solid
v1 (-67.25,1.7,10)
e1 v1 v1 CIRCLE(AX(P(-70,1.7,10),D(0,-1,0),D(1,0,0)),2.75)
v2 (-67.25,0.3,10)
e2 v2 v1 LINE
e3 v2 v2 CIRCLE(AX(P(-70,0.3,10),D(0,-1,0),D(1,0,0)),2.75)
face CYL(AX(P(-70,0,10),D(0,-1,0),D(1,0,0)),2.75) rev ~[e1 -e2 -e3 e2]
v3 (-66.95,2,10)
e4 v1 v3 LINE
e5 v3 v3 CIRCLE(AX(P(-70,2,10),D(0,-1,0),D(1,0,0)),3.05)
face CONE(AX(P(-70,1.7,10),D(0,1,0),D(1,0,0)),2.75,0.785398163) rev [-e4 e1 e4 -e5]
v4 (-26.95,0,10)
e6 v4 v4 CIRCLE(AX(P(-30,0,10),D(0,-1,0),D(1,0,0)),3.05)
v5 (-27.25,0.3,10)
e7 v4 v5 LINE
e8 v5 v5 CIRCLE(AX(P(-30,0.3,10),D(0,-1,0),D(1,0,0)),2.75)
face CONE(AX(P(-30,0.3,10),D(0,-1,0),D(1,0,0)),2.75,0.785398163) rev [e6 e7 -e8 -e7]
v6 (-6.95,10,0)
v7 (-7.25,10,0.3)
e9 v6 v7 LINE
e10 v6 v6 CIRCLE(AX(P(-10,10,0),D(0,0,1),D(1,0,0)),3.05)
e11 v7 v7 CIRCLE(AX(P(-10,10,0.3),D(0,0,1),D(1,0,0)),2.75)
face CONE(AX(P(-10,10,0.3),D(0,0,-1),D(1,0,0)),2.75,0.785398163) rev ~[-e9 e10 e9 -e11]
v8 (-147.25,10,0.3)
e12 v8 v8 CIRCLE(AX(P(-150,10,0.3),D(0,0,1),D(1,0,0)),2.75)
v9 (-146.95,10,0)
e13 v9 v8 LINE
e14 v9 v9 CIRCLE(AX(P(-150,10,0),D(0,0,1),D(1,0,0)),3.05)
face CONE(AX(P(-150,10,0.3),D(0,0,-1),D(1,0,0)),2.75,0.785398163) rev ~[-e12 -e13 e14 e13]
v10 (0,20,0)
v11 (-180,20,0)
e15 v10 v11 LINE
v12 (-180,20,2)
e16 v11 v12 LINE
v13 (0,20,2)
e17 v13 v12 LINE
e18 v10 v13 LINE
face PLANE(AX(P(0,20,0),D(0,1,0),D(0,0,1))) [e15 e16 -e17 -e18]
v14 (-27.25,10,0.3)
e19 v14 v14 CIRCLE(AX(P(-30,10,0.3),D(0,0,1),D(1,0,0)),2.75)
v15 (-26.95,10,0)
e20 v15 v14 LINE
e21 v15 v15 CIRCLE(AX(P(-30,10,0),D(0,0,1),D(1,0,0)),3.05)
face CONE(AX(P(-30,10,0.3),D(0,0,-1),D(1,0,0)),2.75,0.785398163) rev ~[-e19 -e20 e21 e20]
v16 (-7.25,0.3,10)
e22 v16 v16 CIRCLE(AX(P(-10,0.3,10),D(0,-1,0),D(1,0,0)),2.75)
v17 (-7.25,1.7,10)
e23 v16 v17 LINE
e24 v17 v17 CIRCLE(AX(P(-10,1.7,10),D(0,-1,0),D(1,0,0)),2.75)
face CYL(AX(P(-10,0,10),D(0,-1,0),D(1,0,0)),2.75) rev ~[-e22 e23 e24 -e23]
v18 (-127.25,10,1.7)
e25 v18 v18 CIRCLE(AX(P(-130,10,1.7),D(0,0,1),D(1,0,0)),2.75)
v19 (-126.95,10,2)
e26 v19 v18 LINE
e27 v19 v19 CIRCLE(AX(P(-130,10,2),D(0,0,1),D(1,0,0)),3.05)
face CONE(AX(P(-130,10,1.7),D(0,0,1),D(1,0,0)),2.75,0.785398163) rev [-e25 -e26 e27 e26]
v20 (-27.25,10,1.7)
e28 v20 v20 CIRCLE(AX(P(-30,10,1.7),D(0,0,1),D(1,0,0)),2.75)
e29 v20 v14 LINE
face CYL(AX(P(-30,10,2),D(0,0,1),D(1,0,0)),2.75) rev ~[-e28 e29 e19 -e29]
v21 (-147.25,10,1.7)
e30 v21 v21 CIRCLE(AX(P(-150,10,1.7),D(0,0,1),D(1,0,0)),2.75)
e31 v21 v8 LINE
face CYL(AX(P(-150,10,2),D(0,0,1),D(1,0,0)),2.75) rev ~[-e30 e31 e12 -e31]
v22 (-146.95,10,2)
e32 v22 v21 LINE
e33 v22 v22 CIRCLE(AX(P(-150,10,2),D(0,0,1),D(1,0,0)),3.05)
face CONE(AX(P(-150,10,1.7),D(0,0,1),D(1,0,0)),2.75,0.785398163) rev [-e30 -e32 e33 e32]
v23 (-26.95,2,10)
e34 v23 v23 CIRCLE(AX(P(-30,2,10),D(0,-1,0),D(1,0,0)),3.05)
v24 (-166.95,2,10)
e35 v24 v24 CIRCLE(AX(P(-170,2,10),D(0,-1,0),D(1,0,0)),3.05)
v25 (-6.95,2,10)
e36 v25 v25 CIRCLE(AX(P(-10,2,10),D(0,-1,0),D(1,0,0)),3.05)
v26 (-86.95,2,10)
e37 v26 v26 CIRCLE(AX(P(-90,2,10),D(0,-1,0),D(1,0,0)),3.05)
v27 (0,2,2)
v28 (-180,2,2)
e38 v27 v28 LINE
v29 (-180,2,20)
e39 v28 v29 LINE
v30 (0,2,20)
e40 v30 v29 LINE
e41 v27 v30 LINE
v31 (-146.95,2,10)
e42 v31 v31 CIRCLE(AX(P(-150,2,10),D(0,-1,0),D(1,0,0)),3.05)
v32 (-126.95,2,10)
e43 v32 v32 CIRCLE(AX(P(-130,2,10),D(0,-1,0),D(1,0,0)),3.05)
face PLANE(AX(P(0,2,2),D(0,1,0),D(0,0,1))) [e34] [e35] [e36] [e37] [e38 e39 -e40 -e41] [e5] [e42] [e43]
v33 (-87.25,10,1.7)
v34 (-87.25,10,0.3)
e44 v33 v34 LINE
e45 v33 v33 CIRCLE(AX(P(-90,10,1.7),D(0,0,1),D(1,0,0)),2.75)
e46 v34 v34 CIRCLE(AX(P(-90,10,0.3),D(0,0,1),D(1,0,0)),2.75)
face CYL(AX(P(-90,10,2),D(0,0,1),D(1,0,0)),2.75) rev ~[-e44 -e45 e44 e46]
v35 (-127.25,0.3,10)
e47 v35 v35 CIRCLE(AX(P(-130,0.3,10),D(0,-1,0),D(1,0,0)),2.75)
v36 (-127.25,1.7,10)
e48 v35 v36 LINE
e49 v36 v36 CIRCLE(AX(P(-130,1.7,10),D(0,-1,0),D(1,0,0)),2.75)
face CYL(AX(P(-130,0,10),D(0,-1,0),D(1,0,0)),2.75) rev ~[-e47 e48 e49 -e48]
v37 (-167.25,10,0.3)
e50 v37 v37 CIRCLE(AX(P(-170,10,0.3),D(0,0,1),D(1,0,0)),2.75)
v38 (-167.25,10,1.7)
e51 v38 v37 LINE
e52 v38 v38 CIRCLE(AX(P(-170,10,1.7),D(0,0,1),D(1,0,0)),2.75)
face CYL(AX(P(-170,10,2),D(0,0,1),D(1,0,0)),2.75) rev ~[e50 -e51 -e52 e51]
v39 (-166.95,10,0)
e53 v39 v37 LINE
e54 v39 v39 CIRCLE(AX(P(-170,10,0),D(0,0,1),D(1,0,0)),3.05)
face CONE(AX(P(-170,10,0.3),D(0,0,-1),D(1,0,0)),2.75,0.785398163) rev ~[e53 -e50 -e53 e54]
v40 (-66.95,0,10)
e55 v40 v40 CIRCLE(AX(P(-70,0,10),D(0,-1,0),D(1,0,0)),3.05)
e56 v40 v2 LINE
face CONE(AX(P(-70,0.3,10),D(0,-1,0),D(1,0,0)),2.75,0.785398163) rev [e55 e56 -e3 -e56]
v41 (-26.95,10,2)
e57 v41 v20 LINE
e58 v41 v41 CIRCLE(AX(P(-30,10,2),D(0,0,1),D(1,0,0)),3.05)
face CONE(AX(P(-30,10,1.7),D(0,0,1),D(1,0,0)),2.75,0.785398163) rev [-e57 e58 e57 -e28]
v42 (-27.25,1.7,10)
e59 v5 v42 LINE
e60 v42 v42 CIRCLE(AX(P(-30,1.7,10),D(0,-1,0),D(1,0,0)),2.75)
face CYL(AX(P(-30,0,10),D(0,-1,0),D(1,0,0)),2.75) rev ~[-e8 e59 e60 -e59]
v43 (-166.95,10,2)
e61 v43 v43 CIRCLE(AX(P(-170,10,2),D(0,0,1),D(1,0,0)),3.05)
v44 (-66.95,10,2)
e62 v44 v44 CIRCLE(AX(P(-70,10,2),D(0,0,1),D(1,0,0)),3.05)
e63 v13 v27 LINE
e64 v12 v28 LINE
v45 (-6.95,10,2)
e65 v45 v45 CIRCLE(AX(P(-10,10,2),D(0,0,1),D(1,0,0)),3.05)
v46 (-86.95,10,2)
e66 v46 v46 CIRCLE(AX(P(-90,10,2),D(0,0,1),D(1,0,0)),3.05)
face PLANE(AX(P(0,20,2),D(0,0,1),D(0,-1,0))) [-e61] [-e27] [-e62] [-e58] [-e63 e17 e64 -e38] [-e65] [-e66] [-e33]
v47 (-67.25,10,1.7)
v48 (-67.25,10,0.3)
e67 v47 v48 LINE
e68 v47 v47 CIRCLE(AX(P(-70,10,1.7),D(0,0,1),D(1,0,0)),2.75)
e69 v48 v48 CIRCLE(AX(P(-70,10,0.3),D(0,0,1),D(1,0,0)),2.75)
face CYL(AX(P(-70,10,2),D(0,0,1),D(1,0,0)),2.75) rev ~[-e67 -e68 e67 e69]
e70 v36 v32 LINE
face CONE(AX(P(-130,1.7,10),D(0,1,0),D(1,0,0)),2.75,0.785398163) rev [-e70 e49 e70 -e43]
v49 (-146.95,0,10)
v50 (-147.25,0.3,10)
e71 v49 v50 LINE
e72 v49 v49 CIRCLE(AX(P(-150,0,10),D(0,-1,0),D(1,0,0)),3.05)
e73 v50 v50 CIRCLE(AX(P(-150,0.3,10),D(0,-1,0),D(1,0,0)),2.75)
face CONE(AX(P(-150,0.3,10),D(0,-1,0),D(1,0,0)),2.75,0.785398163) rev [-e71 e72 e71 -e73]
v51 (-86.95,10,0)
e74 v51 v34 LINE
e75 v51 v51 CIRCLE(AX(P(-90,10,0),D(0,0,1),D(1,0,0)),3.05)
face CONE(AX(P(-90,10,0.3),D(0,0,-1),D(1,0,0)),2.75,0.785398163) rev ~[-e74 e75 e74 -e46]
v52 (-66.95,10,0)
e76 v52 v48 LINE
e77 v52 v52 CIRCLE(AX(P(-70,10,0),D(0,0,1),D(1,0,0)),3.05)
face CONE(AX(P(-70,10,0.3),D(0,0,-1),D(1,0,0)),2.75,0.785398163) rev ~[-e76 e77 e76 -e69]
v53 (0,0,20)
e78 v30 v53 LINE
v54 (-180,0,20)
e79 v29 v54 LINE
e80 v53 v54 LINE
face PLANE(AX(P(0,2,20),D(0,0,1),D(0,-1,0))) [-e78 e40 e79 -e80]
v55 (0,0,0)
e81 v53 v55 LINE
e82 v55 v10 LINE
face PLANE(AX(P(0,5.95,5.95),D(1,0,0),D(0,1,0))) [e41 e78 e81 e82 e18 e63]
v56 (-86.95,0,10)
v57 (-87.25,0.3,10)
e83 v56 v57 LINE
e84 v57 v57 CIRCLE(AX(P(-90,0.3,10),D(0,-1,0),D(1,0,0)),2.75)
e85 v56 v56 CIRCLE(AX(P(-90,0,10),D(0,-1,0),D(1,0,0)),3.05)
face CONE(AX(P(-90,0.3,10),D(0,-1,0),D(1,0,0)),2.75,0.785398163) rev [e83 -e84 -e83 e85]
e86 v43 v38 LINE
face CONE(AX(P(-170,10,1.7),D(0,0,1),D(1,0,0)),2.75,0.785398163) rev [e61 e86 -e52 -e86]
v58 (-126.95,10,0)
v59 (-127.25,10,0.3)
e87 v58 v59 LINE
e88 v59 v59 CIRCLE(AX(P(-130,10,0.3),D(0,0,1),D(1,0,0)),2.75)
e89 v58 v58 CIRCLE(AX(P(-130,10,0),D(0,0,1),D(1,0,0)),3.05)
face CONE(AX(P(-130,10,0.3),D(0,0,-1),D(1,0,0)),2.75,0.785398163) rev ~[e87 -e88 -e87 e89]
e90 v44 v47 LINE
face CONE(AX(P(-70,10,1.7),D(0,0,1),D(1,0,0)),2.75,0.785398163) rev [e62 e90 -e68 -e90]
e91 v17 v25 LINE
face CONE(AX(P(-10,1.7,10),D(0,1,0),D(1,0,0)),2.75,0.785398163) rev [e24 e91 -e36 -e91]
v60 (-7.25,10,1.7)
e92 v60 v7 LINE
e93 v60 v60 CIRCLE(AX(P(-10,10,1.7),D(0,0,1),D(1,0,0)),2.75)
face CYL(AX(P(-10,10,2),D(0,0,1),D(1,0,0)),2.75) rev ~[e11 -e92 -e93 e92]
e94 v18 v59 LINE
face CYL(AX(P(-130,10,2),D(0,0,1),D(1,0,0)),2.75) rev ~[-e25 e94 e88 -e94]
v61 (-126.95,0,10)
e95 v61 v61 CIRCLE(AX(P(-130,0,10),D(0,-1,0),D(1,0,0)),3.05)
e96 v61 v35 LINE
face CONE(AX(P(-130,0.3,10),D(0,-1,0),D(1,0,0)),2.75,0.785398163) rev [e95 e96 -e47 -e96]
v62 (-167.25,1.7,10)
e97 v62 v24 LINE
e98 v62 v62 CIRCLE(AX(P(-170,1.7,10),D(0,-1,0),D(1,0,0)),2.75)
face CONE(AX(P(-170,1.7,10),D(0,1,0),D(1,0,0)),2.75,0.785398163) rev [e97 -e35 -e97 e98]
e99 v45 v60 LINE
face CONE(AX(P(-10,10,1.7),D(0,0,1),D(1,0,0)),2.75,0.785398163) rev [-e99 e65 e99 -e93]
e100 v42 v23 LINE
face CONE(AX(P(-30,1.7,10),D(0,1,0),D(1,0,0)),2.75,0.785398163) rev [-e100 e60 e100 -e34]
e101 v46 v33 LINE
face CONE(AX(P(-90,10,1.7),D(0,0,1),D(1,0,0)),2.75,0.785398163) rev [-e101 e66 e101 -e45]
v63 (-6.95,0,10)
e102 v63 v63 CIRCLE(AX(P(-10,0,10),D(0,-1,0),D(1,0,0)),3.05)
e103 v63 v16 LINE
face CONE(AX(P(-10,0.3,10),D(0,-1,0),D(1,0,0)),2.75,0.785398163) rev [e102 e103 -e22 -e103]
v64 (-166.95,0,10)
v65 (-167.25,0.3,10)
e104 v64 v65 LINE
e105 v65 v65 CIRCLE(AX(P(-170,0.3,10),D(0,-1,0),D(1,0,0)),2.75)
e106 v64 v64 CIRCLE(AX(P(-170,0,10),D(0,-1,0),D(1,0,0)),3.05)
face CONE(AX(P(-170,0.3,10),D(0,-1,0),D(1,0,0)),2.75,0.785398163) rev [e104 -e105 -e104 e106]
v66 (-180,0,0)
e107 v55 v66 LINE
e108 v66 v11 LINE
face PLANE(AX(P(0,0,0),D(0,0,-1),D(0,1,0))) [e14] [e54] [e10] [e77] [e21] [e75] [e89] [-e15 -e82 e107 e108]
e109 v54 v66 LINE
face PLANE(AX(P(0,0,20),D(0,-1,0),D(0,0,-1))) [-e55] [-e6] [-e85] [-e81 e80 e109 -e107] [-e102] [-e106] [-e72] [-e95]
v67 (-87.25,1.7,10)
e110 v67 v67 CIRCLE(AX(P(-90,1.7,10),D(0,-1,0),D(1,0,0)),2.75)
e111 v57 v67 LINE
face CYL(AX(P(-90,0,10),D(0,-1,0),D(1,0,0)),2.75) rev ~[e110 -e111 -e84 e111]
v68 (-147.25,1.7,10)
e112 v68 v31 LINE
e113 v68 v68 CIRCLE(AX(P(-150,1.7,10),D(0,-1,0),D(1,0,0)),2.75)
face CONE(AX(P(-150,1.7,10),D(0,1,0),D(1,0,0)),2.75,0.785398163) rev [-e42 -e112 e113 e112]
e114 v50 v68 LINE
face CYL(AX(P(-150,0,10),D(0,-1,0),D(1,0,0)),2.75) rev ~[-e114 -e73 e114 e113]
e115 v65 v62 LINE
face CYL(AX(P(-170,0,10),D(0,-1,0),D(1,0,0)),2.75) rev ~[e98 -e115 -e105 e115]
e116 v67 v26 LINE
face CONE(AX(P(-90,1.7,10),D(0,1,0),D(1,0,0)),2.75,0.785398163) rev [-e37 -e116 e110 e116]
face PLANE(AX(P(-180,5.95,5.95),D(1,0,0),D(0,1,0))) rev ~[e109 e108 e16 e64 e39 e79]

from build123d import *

# Parameters (mm, degrees)
F1_DEPTH = 180
F2_R     = 2.75
F3_DEPTH = 2.001
F4_R     = 2.75
F5_DEPTH = 20.001
F6_SIZE  = 0.3


# Not quite as in the source:
# - a feature names something its author has since deleted; it is built from what else it names


with BuildPart() as f1:
    # F0 (on Right) → F1 (new body)
    with BuildSketch(Plane.YZ):
        Polygon((0, 20), (0, 0), (20, 0), (20, 2), (2, 2), (2, 20), align=None)
    extrude(amount=-F1_DEPTH)

    # F2 (on face) → F3 (cut, through all)
    with BuildSketch(Plane.XY.offset(2)):
        with Locations((-10, 10)):
            Circle(F2_R)
        with Locations((-170, 10)):
            Circle(F2_R)
        with Locations((-150, 10)):
            Circle(F2_R)
        with Locations((-90, 10)):
            Circle(F2_R)
        with Locations((-70, 10)):
            Circle(F2_R)
        with Locations((-30, 10)):
            Circle(F2_R)
        with Locations((-130, 10)):
            Circle(F2_R)
    extrude(amount=-F3_DEPTH, mode=Mode.SUBTRACT)

    # F4 (on face) → F5 (cut, through all)
    with BuildSketch(Plane.XZ):
        with Locations((-170, 10)):
            Circle(F4_R)
        with Locations((-150, 10)):
            Circle(F4_R)
        with Locations((-90, 10)):
            Circle(F4_R)
        with Locations((-70, 10)):
            Circle(F4_R)
        with Locations((-30, 10)):
            Circle(F4_R)
        with Locations((-10, 10)):
            Circle(F4_R)
        with Locations((-130, 10)):
            Circle(F4_R)
    extrude(amount=-F5_DEPTH, mode=Mode.SUBTRACT)

    # F6
    f6_edges = [f1.edges().sort_by_distance(p)[0] for p in [
        (-172.75, 10, 2),
        (-167.25, 10, 1),
        (-172.75, 10, 0),
        (-152.75, 10, 2),
        (-147.25, 10, 1),
        (-152.75, 10, 0),
        (-92.75, 10, 2),
        (-87.25, 10, 1),
        (-92.75, 10, 0),
        (-72.75, 10, 2),
        (-67.25, 10, 1),
        (-72.75, 10, 0),
        (-32.75, 10, 2),
        (-27.25, 10, 1),
        (-32.75, 10, 0),
        (-12.75, 10, 2),
        (-7.25, 10, 1),
        (-12.75, 10, 0),
        (-12.75, 0, 10),
        (-7.25, 1, 10),
        (-12.75, 2, 10),
        (-32.75, 0, 10),
        (-27.25, 1, 10),
        (-32.75, 2, 10),
        (-72.75, 0, 10),
        (-67.25, 1, 10),
        (-72.75, 2, 10),
        (-92.75, 0, 10),
        (-87.25, 1, 10),
        (-92.75, 2, 10),
        (-152.75, 0, 10),
        (-147.25, 1, 10),
        (-152.75, 2, 10),
        (-172.75, 0, 10),
        (-167.25, 1, 10),
        (-172.75, 2, 10),
        (-132.75, 10, 0),
        (-132.75, 10, 2),
        (-132.75, 0, 10),
        (-127.25, 1, 10),
        (-132.75, 2, 10),
    ]]
    chamfer(f6_edges, length=F6_SIZE)


solid = f1.part
